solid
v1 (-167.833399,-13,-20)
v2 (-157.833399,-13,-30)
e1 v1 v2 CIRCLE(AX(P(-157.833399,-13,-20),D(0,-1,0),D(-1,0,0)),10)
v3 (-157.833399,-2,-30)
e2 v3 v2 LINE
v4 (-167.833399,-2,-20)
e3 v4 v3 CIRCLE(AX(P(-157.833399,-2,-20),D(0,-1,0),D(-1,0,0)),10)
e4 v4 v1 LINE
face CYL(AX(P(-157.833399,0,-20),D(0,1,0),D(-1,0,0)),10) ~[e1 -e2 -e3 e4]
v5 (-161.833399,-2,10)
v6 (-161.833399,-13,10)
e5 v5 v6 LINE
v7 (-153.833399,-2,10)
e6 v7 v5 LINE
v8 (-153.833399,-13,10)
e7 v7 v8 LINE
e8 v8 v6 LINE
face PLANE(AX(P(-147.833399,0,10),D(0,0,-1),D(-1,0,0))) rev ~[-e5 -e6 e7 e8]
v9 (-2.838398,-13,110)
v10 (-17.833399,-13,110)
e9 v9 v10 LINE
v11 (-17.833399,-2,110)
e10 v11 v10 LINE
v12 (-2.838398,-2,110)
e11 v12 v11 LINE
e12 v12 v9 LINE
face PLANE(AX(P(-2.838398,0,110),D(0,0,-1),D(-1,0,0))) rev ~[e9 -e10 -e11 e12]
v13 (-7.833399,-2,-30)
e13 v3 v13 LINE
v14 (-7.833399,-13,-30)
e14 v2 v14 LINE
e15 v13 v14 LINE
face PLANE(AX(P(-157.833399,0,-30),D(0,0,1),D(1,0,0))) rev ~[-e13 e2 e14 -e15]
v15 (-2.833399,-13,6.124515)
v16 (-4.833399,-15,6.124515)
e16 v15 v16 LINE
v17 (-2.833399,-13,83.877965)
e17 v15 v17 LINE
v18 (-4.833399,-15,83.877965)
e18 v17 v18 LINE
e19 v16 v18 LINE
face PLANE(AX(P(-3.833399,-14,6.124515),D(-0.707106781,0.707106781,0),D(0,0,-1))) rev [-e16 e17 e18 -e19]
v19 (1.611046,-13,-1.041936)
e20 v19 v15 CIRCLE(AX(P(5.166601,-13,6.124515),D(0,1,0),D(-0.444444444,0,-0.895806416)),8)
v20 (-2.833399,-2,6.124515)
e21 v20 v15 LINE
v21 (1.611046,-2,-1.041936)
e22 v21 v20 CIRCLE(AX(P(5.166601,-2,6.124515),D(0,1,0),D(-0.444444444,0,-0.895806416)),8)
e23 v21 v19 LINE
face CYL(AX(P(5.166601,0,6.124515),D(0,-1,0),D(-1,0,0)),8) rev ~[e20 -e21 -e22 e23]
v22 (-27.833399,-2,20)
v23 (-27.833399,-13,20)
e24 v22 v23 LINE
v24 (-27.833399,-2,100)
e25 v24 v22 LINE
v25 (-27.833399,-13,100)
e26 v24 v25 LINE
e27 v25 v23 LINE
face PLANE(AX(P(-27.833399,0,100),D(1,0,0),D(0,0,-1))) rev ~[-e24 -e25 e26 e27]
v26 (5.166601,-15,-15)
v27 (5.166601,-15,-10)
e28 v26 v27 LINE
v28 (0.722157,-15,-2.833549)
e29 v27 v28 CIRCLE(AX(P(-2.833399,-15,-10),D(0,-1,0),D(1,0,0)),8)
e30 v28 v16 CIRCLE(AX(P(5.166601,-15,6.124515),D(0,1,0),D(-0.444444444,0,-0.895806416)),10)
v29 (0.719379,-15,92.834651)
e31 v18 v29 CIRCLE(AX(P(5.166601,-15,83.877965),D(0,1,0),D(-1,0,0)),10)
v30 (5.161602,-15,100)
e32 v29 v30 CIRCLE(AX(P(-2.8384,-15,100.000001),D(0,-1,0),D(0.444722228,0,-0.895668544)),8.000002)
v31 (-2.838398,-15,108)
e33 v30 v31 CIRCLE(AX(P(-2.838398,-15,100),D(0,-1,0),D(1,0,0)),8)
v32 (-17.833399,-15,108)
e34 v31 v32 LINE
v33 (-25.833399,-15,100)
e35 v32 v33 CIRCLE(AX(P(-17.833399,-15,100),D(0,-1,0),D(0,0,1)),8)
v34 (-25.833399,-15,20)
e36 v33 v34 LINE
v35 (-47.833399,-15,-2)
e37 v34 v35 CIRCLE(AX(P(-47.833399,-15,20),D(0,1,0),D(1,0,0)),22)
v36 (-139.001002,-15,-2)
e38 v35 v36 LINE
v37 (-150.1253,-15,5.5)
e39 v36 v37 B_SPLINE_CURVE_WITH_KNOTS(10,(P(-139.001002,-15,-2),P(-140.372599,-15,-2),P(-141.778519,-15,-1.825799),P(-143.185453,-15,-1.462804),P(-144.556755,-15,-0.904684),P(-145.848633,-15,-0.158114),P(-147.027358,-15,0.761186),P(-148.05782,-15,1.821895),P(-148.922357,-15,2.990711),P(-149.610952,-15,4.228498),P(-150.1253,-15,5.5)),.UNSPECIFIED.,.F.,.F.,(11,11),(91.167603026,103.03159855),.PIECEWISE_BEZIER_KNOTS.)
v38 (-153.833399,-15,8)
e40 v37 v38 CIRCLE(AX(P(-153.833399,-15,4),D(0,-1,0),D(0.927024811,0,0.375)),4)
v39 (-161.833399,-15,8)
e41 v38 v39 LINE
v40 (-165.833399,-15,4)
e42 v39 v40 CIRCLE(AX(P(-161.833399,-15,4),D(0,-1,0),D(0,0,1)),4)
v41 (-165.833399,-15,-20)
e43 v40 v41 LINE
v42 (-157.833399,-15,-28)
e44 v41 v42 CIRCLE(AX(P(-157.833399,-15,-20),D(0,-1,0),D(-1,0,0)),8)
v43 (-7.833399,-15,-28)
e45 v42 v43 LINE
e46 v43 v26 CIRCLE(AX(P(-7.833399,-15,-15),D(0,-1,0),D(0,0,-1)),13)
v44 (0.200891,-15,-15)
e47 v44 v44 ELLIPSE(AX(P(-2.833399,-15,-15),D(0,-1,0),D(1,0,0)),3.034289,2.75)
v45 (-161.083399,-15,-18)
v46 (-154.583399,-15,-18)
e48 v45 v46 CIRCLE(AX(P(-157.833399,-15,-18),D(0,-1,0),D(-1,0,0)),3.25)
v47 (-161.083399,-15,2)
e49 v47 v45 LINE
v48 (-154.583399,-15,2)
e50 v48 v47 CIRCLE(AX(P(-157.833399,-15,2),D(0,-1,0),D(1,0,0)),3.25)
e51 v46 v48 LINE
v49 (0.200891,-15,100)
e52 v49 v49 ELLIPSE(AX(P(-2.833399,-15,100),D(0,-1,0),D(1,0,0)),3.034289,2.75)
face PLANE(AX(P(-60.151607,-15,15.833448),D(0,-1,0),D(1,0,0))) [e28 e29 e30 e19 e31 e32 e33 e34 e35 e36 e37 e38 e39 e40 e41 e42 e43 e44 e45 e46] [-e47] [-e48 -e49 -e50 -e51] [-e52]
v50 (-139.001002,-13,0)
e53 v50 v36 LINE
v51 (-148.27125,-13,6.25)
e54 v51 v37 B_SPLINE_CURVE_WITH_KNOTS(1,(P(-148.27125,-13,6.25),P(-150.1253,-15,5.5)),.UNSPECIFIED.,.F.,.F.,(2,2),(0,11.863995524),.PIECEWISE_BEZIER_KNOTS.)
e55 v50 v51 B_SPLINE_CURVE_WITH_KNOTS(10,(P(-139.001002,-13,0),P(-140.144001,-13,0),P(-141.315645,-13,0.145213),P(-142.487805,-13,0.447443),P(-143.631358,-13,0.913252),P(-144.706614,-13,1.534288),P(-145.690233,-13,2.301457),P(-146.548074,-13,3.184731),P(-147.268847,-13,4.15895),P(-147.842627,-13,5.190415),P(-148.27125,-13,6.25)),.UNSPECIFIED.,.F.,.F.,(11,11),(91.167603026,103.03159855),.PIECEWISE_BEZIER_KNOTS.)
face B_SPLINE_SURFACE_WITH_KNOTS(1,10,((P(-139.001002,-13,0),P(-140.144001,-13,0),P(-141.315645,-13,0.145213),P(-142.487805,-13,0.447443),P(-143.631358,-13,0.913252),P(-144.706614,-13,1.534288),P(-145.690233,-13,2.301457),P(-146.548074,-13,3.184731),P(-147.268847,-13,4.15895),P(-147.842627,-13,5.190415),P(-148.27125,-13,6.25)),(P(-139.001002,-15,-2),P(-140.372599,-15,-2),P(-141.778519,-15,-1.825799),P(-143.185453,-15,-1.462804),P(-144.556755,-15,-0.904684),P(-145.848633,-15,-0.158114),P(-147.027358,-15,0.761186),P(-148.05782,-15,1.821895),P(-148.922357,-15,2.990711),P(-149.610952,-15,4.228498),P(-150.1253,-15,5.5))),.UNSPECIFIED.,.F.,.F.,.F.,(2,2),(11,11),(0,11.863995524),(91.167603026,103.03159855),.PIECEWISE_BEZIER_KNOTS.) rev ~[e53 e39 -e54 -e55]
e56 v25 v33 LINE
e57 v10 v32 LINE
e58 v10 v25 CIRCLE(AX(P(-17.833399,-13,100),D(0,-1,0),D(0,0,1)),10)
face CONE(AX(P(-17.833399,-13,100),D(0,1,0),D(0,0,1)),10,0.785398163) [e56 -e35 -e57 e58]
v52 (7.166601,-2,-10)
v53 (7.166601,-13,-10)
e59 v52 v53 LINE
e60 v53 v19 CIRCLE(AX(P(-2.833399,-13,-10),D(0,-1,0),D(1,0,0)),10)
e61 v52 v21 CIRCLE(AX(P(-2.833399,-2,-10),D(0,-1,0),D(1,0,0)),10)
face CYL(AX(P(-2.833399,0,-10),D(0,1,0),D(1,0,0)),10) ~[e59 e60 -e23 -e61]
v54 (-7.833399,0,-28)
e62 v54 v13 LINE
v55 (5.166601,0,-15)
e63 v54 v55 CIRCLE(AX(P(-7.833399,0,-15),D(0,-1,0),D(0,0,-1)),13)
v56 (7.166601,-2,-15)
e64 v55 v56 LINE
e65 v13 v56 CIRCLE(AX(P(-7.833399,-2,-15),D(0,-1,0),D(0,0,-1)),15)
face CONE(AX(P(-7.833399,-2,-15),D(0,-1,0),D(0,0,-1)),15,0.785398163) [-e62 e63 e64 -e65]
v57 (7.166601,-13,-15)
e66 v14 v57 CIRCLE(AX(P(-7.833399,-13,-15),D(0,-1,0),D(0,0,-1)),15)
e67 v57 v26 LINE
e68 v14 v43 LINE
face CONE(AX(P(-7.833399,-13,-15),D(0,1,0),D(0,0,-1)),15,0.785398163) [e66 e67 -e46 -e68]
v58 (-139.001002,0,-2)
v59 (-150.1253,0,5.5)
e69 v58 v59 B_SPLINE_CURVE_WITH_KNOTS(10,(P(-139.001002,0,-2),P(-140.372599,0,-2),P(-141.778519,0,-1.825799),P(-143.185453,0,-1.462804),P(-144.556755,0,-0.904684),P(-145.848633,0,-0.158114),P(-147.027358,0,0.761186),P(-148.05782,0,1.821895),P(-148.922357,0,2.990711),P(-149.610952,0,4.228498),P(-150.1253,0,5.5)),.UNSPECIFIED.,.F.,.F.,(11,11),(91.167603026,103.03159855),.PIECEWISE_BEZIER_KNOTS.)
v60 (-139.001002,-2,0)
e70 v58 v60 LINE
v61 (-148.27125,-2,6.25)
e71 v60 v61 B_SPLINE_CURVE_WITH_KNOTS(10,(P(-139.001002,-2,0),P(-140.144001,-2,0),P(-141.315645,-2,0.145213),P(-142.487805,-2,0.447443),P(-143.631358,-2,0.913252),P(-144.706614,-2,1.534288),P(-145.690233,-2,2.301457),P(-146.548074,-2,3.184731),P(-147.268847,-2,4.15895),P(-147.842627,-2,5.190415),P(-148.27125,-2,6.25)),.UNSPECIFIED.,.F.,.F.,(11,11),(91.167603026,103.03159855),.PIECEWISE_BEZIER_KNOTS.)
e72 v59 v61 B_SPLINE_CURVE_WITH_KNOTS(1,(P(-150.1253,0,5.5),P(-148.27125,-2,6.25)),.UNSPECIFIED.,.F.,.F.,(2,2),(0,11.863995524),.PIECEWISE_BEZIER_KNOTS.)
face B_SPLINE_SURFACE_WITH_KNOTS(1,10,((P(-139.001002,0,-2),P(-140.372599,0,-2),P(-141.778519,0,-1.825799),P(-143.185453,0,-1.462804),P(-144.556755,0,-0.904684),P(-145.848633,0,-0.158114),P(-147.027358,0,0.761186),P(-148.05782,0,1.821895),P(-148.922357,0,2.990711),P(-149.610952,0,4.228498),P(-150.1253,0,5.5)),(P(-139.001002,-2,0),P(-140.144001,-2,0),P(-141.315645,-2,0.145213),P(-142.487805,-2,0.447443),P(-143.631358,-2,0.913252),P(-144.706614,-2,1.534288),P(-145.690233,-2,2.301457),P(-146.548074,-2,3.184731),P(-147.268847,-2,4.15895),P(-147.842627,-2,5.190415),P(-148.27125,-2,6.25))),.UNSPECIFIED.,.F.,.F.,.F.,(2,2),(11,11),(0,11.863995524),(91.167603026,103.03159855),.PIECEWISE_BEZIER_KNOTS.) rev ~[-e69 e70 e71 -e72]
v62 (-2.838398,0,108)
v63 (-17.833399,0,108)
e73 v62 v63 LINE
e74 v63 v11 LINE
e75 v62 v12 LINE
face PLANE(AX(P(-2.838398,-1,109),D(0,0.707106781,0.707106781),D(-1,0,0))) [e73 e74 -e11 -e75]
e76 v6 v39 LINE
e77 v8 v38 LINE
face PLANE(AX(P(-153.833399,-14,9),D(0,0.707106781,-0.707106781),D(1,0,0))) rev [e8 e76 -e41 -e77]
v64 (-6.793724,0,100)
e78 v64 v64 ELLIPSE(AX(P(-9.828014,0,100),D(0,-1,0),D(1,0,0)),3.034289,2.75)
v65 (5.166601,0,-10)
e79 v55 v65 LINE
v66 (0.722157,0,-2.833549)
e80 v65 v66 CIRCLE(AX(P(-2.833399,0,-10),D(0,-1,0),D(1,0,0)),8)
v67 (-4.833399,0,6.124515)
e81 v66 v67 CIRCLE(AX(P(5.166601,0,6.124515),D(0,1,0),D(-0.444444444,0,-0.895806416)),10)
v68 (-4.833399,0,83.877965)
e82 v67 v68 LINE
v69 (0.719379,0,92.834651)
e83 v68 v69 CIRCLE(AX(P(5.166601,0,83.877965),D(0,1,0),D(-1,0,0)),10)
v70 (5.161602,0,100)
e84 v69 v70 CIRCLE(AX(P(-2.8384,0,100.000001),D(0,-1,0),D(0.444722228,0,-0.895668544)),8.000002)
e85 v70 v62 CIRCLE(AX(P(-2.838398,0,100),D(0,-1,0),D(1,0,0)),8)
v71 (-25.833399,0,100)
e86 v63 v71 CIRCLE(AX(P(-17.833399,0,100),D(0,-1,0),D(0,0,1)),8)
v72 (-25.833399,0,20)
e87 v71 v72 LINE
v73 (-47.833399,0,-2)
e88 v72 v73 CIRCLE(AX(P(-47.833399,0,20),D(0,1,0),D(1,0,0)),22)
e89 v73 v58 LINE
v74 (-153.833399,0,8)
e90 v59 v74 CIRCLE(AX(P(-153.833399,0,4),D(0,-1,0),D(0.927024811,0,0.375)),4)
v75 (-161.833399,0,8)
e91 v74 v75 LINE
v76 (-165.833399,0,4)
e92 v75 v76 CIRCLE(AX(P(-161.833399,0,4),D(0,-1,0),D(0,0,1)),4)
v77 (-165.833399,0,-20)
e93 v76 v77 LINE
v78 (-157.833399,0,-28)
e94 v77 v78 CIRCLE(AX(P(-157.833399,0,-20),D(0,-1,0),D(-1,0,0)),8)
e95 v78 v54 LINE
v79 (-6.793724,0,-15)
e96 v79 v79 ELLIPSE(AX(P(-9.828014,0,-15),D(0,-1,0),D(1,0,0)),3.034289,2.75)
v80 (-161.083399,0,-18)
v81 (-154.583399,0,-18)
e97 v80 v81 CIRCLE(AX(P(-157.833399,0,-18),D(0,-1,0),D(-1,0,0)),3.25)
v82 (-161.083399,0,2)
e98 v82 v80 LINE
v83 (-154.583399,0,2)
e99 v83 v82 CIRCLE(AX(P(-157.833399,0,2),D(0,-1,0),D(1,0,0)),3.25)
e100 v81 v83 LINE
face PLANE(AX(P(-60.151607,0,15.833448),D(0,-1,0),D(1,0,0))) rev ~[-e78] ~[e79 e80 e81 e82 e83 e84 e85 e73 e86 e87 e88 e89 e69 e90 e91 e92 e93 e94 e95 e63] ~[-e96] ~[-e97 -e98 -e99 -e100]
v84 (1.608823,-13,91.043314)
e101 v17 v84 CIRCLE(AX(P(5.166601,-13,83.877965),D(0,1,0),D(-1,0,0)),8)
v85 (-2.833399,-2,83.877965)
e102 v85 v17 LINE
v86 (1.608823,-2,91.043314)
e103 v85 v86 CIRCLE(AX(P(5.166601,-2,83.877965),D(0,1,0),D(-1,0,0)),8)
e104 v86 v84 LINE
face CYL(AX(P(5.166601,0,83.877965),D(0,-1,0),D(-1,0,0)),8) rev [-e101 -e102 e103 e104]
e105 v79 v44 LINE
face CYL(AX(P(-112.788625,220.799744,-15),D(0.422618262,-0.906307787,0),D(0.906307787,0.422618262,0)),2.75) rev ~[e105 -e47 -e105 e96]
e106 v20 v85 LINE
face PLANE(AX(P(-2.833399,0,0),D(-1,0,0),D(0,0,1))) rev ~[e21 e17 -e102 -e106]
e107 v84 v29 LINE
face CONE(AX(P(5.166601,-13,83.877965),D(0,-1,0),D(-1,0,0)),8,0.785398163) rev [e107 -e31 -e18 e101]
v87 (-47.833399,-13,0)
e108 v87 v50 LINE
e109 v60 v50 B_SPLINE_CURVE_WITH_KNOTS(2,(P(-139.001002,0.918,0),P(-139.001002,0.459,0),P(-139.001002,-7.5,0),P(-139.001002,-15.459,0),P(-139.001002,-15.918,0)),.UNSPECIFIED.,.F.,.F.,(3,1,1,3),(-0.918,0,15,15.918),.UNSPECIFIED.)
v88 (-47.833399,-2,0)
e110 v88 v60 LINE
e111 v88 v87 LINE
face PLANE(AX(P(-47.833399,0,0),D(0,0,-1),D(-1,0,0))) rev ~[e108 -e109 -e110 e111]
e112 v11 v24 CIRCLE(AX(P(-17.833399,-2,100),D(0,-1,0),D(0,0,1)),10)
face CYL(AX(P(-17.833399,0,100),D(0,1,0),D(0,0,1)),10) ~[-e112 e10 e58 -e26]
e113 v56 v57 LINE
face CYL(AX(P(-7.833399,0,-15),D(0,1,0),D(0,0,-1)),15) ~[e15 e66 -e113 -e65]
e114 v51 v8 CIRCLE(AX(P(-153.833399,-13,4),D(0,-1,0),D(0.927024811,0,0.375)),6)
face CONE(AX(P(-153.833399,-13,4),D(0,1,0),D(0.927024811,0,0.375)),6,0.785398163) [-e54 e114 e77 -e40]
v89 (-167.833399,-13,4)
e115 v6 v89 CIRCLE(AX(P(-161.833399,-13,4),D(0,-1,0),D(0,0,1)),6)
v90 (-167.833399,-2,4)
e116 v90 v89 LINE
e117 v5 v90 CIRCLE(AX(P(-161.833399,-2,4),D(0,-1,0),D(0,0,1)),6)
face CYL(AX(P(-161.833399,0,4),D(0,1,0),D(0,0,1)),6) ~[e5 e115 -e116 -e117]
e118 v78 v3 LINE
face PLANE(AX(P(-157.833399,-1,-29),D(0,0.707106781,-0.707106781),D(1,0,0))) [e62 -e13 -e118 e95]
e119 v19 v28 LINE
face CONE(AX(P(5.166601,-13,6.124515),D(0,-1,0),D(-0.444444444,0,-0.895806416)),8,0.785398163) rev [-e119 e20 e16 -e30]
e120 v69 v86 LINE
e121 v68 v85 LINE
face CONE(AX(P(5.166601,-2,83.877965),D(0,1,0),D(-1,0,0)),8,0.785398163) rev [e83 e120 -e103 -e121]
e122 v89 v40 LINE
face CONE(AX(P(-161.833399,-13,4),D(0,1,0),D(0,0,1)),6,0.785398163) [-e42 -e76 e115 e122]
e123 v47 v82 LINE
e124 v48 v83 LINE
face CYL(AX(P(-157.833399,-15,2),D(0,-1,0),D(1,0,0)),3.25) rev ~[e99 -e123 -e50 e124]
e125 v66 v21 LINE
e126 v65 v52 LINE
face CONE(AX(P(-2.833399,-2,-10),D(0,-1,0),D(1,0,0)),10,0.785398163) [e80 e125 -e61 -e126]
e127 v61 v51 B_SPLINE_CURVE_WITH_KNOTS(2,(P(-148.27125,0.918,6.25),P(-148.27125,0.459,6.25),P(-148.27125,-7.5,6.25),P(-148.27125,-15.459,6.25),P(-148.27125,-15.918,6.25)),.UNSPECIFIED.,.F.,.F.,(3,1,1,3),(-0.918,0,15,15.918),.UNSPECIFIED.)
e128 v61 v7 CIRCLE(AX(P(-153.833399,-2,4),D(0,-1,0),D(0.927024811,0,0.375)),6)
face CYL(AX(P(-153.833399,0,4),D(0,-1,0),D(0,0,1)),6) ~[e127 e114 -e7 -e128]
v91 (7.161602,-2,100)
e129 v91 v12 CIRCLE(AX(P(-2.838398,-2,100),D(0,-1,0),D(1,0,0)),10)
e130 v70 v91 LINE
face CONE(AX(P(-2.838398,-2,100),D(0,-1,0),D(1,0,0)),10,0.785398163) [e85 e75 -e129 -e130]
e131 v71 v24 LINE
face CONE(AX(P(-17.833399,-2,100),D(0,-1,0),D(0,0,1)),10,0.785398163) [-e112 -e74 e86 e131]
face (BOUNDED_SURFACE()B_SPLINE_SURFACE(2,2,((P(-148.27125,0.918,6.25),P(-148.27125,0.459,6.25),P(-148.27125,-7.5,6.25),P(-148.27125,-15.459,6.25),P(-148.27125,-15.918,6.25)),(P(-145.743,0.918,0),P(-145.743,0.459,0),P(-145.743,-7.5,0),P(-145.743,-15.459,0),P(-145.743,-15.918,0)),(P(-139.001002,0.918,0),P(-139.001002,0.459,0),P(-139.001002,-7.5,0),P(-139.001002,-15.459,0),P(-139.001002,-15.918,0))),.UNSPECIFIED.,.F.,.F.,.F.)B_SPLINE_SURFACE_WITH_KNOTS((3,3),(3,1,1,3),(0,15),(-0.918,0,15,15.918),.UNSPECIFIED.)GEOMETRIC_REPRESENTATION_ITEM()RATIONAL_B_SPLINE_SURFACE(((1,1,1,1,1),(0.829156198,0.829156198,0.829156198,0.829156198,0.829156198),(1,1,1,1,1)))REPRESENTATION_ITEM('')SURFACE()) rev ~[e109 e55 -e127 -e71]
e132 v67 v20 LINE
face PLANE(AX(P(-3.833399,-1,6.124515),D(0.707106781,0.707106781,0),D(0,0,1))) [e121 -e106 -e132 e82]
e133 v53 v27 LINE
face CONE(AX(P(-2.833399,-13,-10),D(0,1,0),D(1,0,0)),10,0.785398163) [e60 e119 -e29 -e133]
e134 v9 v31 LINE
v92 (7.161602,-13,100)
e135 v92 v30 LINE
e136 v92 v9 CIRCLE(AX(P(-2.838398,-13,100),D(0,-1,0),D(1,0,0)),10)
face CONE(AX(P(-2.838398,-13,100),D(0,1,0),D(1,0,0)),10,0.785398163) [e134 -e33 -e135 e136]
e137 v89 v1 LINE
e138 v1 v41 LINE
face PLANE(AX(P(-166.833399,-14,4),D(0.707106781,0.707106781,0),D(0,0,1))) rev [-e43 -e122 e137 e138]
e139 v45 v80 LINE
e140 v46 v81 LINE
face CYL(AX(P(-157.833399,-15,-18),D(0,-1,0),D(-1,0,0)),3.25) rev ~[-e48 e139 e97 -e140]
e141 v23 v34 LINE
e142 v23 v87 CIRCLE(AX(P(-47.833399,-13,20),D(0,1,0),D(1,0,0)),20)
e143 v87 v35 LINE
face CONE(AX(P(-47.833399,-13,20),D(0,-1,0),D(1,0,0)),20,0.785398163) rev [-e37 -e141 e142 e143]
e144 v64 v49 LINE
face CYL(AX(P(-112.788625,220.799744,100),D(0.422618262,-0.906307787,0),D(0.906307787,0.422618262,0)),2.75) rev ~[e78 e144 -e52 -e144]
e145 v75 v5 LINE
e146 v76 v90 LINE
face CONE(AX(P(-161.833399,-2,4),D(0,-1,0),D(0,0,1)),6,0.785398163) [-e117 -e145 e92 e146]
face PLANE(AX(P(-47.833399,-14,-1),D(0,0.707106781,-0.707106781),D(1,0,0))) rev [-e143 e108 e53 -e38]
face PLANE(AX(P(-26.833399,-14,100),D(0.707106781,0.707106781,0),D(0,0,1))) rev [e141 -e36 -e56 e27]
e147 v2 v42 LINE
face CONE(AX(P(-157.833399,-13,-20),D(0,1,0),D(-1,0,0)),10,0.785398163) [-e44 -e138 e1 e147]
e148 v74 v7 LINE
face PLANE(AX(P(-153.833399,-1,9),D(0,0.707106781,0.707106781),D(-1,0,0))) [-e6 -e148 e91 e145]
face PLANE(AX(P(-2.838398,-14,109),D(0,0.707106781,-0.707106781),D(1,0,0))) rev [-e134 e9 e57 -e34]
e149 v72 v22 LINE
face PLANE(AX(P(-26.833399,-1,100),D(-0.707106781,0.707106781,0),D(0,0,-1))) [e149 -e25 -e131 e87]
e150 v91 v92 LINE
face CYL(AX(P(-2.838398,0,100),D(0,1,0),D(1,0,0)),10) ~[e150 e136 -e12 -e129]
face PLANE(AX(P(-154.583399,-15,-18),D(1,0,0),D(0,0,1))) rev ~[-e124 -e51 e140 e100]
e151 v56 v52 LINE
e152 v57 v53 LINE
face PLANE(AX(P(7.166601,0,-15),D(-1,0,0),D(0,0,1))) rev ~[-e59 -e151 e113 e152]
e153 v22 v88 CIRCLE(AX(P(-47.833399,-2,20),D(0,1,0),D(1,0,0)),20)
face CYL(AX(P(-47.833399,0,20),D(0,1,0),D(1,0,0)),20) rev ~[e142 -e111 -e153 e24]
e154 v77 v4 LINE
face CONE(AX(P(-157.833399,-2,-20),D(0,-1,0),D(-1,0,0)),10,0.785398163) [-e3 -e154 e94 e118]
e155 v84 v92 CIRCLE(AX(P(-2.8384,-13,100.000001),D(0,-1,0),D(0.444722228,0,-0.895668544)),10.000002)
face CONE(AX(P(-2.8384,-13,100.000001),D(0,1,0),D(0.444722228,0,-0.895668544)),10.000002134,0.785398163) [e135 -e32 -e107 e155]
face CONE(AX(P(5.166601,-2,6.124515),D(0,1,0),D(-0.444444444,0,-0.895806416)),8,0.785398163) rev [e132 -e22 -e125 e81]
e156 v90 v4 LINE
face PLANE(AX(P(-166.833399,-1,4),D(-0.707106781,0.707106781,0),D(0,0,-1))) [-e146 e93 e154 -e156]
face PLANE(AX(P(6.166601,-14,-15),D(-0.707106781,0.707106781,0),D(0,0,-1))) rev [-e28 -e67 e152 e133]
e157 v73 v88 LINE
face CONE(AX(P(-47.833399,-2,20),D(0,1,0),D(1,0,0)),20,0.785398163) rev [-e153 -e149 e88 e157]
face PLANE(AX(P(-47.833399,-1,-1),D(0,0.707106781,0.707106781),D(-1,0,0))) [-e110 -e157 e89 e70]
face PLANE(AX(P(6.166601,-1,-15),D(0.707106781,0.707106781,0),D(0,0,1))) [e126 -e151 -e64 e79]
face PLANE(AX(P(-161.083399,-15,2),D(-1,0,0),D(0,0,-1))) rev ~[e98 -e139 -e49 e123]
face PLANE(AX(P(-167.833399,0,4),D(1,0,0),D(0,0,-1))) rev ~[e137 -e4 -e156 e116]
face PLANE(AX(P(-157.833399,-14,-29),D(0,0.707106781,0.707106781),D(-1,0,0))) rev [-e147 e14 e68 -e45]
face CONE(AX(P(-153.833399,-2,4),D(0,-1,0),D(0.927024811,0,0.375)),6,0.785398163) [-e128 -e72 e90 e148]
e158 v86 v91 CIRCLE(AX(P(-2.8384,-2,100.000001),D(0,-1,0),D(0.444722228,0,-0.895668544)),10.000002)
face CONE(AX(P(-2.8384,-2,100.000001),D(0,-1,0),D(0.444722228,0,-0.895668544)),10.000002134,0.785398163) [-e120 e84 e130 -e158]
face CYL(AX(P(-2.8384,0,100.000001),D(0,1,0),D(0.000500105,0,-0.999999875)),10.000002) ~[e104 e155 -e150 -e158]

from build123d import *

# Parameters (mm, degrees)
F1_DEPTH = 15
F3_DEPTH = 20
F8_D     = 5.5
F9_R     = 8
F10_R    = 6
F11_R    = 10
F12_SIZE = 2


# Not quite as in the source:
# - ends of sketch curves that miss each other by under 0.0002 mm in the source are joined


with BuildPart() as f1:
    # F0 (on Front) → F1 (new body)
    with BuildSketch(Plane.XZ):
        with BuildLine():
            Line((-2.8333987482, 0), (-2.8333987482, 90))
            ThreePointArc((-2.8333987482, 90), (4.2344373086, 92.9306997935), (7.1616023332, 100))
            ThreePointArc((7.1616023332, 100), (4.2326701451, 107.0710678119), (-2.8383976668, 110))
            Line((-2.8383976668, 110), (-17.8333987482, 110))
            ThreePointArc((-17.8333987482, 110), (-24.9044665601, 107.0710678119), (-27.8333987482, 100))
            Line((-27.8333987482, 100), (-27.8333987482, 20))
            ThreePointArc((-27.8333987482, 20), (-33.6912631245, 5.8578643763), (-47.8333987482, 0))
            Line((-47.8333987482, 0), (-147.8333987482, 0))
            Line((-147.8333987482, 0), (-147.8333987482, 10))
            Line((-147.8333987482, 10), (-153.8333987482, 10))
            Line((-153.8333987482, 10), (-161.8333987482, 10))
            ThreePointArc((-161.8333987482, 10), (-166.0760394353, 8.2426406871), (-167.8333987482, 4))
            Line((-167.8333987482, 4), (-167.8333987482, -20))
            ThreePointArc((-167.8333987482, -20), (-164.9044665601, -27.0710678119), (-157.8333987482, -30))
            Line((-157.8333987482, -30), (-7.8333987482, -30))
            ThreePointArc((-7.8333987482, -30), (2.7732029696, -25.6066017178), (7.1666012518, -15))
            Line((7.1666012518, -15), (7.1666012518, -10))
            ThreePointArc((7.1666012518, -10), (4.2376690637, -2.9289321881), (-2.8333987482, 0))
        make_face()
    extrude(amount=F1_DEPTH)

    # F2 (on face) → F3 (cut)
    with BuildSketch(Plane.XZ.offset(15)):
        with BuildLine():
            Line((-154.5833987482, -18), (-154.5833987482, 2))
            ThreePointArc((-154.5833987482, 2), (-157.8333987482, 5.25), (-161.0833987482, 2))
            Line((-161.0833987482, 2), (-161.0833987482, -18))
            ThreePointArc((-161.0833987482, -18), (-157.8333987482, -21.25), (-154.5833987482, -18))
        make_face()
    extrude(amount=-F3_DEPTH, mode=Mode.SUBTRACT)

    # F8 (through all)
    with Locations(Plane(origin=(-9.7913406688, 20.9975978253, 0), x_dir=(-0.906307787, -0.4226182617, 0), z_dir=(-0.4226182617, 0.906307787, 0))):
        with Locations((8.9072052754, 100), (8.9072052754, -15)):
            Hole(F8_D / 2)

    # F9
    f9_edges = [f1.edges().sort_by_distance(p)[0] for p in [
        (-2.833399, -7.5, 0),
        (-2.833399, -7.5, 90),
    ]]
    fillet(f9_edges, radius=F9_R)

    # F10
    f10_edges = [f1.edges().sort_by_distance(p)[0] for p in [
        (-147.833399, -7.5, 10),
    ]]
    fillet(f10_edges, radius=F10_R)

    # F11
    f11_edges = [f1.edges().sort_by_distance(p)[0] for p in [
        (-147.833399, -7.5, 0),
    ]]
    fillet(f11_edges, radius=F11_R)

    # F12
    f12_edges = [f1.edges().sort_by_distance(p)[0] for p in [
        (-93.4172, -15, 0),
        (-93.4172, 0, 0),
        (-150.479297, 0, 8.974937),
        (-144.591172, 0, 1.708438),
        (-157.833399, 0, 10),
        (-166.076039, 0, 8.242641),
        (-33.691263, 0, 5.857864),
        (-167.833399, 0, -8),
        (-27.833399, 0, 60),
        (-164.904467, 0, -27.071068),
        (-24.904467, 0, 107.071068),
        (-82.833399, 0, -30),
        (-10.335898, 0, 110),
        (2.773203, 0, -25.606602),
        (4.23267, 0, 107.071068),
        (7.166601, 0, -12.5),
        (5.660785, 0, 94.730854),
        (5.664967, 0, -4.729537),
        (-1.632745, 0, 88.093281),
        (-1.632091, 0, 1.908145),
        (-2.833399, 0, 45.00124),
        (-150.479297, -15, 8.974937),
        (-144.591172, -15, 1.708438),
        (-157.833399, -15, 10),
        (-166.076039, -15, 8.242641),
        (-33.691263, -15, 5.857864),
        (-167.833399, -15, -8),
        (-27.833399, -15, 60),
        (-164.904467, -15, -27.071068),
        (-24.904467, -15, 107.071068),
        (-82.833399, -15, -30),
        (-10.335898, -15, 110),
        (2.773203, -15, -25.606602),
        (4.23267, -15, 107.071068),
        (7.166601, -15, -12.5),
        (5.660785, -15, 94.730854),
        (5.664967, -15, -4.729537),
        (-1.632745, -15, 88.093281),
        (-1.632091, -15, 1.908145),
        (-2.833399, -15, 45.00124),
    ]]
    chamfer(f12_edges, length=F12_SIZE)


solid = f1.part
